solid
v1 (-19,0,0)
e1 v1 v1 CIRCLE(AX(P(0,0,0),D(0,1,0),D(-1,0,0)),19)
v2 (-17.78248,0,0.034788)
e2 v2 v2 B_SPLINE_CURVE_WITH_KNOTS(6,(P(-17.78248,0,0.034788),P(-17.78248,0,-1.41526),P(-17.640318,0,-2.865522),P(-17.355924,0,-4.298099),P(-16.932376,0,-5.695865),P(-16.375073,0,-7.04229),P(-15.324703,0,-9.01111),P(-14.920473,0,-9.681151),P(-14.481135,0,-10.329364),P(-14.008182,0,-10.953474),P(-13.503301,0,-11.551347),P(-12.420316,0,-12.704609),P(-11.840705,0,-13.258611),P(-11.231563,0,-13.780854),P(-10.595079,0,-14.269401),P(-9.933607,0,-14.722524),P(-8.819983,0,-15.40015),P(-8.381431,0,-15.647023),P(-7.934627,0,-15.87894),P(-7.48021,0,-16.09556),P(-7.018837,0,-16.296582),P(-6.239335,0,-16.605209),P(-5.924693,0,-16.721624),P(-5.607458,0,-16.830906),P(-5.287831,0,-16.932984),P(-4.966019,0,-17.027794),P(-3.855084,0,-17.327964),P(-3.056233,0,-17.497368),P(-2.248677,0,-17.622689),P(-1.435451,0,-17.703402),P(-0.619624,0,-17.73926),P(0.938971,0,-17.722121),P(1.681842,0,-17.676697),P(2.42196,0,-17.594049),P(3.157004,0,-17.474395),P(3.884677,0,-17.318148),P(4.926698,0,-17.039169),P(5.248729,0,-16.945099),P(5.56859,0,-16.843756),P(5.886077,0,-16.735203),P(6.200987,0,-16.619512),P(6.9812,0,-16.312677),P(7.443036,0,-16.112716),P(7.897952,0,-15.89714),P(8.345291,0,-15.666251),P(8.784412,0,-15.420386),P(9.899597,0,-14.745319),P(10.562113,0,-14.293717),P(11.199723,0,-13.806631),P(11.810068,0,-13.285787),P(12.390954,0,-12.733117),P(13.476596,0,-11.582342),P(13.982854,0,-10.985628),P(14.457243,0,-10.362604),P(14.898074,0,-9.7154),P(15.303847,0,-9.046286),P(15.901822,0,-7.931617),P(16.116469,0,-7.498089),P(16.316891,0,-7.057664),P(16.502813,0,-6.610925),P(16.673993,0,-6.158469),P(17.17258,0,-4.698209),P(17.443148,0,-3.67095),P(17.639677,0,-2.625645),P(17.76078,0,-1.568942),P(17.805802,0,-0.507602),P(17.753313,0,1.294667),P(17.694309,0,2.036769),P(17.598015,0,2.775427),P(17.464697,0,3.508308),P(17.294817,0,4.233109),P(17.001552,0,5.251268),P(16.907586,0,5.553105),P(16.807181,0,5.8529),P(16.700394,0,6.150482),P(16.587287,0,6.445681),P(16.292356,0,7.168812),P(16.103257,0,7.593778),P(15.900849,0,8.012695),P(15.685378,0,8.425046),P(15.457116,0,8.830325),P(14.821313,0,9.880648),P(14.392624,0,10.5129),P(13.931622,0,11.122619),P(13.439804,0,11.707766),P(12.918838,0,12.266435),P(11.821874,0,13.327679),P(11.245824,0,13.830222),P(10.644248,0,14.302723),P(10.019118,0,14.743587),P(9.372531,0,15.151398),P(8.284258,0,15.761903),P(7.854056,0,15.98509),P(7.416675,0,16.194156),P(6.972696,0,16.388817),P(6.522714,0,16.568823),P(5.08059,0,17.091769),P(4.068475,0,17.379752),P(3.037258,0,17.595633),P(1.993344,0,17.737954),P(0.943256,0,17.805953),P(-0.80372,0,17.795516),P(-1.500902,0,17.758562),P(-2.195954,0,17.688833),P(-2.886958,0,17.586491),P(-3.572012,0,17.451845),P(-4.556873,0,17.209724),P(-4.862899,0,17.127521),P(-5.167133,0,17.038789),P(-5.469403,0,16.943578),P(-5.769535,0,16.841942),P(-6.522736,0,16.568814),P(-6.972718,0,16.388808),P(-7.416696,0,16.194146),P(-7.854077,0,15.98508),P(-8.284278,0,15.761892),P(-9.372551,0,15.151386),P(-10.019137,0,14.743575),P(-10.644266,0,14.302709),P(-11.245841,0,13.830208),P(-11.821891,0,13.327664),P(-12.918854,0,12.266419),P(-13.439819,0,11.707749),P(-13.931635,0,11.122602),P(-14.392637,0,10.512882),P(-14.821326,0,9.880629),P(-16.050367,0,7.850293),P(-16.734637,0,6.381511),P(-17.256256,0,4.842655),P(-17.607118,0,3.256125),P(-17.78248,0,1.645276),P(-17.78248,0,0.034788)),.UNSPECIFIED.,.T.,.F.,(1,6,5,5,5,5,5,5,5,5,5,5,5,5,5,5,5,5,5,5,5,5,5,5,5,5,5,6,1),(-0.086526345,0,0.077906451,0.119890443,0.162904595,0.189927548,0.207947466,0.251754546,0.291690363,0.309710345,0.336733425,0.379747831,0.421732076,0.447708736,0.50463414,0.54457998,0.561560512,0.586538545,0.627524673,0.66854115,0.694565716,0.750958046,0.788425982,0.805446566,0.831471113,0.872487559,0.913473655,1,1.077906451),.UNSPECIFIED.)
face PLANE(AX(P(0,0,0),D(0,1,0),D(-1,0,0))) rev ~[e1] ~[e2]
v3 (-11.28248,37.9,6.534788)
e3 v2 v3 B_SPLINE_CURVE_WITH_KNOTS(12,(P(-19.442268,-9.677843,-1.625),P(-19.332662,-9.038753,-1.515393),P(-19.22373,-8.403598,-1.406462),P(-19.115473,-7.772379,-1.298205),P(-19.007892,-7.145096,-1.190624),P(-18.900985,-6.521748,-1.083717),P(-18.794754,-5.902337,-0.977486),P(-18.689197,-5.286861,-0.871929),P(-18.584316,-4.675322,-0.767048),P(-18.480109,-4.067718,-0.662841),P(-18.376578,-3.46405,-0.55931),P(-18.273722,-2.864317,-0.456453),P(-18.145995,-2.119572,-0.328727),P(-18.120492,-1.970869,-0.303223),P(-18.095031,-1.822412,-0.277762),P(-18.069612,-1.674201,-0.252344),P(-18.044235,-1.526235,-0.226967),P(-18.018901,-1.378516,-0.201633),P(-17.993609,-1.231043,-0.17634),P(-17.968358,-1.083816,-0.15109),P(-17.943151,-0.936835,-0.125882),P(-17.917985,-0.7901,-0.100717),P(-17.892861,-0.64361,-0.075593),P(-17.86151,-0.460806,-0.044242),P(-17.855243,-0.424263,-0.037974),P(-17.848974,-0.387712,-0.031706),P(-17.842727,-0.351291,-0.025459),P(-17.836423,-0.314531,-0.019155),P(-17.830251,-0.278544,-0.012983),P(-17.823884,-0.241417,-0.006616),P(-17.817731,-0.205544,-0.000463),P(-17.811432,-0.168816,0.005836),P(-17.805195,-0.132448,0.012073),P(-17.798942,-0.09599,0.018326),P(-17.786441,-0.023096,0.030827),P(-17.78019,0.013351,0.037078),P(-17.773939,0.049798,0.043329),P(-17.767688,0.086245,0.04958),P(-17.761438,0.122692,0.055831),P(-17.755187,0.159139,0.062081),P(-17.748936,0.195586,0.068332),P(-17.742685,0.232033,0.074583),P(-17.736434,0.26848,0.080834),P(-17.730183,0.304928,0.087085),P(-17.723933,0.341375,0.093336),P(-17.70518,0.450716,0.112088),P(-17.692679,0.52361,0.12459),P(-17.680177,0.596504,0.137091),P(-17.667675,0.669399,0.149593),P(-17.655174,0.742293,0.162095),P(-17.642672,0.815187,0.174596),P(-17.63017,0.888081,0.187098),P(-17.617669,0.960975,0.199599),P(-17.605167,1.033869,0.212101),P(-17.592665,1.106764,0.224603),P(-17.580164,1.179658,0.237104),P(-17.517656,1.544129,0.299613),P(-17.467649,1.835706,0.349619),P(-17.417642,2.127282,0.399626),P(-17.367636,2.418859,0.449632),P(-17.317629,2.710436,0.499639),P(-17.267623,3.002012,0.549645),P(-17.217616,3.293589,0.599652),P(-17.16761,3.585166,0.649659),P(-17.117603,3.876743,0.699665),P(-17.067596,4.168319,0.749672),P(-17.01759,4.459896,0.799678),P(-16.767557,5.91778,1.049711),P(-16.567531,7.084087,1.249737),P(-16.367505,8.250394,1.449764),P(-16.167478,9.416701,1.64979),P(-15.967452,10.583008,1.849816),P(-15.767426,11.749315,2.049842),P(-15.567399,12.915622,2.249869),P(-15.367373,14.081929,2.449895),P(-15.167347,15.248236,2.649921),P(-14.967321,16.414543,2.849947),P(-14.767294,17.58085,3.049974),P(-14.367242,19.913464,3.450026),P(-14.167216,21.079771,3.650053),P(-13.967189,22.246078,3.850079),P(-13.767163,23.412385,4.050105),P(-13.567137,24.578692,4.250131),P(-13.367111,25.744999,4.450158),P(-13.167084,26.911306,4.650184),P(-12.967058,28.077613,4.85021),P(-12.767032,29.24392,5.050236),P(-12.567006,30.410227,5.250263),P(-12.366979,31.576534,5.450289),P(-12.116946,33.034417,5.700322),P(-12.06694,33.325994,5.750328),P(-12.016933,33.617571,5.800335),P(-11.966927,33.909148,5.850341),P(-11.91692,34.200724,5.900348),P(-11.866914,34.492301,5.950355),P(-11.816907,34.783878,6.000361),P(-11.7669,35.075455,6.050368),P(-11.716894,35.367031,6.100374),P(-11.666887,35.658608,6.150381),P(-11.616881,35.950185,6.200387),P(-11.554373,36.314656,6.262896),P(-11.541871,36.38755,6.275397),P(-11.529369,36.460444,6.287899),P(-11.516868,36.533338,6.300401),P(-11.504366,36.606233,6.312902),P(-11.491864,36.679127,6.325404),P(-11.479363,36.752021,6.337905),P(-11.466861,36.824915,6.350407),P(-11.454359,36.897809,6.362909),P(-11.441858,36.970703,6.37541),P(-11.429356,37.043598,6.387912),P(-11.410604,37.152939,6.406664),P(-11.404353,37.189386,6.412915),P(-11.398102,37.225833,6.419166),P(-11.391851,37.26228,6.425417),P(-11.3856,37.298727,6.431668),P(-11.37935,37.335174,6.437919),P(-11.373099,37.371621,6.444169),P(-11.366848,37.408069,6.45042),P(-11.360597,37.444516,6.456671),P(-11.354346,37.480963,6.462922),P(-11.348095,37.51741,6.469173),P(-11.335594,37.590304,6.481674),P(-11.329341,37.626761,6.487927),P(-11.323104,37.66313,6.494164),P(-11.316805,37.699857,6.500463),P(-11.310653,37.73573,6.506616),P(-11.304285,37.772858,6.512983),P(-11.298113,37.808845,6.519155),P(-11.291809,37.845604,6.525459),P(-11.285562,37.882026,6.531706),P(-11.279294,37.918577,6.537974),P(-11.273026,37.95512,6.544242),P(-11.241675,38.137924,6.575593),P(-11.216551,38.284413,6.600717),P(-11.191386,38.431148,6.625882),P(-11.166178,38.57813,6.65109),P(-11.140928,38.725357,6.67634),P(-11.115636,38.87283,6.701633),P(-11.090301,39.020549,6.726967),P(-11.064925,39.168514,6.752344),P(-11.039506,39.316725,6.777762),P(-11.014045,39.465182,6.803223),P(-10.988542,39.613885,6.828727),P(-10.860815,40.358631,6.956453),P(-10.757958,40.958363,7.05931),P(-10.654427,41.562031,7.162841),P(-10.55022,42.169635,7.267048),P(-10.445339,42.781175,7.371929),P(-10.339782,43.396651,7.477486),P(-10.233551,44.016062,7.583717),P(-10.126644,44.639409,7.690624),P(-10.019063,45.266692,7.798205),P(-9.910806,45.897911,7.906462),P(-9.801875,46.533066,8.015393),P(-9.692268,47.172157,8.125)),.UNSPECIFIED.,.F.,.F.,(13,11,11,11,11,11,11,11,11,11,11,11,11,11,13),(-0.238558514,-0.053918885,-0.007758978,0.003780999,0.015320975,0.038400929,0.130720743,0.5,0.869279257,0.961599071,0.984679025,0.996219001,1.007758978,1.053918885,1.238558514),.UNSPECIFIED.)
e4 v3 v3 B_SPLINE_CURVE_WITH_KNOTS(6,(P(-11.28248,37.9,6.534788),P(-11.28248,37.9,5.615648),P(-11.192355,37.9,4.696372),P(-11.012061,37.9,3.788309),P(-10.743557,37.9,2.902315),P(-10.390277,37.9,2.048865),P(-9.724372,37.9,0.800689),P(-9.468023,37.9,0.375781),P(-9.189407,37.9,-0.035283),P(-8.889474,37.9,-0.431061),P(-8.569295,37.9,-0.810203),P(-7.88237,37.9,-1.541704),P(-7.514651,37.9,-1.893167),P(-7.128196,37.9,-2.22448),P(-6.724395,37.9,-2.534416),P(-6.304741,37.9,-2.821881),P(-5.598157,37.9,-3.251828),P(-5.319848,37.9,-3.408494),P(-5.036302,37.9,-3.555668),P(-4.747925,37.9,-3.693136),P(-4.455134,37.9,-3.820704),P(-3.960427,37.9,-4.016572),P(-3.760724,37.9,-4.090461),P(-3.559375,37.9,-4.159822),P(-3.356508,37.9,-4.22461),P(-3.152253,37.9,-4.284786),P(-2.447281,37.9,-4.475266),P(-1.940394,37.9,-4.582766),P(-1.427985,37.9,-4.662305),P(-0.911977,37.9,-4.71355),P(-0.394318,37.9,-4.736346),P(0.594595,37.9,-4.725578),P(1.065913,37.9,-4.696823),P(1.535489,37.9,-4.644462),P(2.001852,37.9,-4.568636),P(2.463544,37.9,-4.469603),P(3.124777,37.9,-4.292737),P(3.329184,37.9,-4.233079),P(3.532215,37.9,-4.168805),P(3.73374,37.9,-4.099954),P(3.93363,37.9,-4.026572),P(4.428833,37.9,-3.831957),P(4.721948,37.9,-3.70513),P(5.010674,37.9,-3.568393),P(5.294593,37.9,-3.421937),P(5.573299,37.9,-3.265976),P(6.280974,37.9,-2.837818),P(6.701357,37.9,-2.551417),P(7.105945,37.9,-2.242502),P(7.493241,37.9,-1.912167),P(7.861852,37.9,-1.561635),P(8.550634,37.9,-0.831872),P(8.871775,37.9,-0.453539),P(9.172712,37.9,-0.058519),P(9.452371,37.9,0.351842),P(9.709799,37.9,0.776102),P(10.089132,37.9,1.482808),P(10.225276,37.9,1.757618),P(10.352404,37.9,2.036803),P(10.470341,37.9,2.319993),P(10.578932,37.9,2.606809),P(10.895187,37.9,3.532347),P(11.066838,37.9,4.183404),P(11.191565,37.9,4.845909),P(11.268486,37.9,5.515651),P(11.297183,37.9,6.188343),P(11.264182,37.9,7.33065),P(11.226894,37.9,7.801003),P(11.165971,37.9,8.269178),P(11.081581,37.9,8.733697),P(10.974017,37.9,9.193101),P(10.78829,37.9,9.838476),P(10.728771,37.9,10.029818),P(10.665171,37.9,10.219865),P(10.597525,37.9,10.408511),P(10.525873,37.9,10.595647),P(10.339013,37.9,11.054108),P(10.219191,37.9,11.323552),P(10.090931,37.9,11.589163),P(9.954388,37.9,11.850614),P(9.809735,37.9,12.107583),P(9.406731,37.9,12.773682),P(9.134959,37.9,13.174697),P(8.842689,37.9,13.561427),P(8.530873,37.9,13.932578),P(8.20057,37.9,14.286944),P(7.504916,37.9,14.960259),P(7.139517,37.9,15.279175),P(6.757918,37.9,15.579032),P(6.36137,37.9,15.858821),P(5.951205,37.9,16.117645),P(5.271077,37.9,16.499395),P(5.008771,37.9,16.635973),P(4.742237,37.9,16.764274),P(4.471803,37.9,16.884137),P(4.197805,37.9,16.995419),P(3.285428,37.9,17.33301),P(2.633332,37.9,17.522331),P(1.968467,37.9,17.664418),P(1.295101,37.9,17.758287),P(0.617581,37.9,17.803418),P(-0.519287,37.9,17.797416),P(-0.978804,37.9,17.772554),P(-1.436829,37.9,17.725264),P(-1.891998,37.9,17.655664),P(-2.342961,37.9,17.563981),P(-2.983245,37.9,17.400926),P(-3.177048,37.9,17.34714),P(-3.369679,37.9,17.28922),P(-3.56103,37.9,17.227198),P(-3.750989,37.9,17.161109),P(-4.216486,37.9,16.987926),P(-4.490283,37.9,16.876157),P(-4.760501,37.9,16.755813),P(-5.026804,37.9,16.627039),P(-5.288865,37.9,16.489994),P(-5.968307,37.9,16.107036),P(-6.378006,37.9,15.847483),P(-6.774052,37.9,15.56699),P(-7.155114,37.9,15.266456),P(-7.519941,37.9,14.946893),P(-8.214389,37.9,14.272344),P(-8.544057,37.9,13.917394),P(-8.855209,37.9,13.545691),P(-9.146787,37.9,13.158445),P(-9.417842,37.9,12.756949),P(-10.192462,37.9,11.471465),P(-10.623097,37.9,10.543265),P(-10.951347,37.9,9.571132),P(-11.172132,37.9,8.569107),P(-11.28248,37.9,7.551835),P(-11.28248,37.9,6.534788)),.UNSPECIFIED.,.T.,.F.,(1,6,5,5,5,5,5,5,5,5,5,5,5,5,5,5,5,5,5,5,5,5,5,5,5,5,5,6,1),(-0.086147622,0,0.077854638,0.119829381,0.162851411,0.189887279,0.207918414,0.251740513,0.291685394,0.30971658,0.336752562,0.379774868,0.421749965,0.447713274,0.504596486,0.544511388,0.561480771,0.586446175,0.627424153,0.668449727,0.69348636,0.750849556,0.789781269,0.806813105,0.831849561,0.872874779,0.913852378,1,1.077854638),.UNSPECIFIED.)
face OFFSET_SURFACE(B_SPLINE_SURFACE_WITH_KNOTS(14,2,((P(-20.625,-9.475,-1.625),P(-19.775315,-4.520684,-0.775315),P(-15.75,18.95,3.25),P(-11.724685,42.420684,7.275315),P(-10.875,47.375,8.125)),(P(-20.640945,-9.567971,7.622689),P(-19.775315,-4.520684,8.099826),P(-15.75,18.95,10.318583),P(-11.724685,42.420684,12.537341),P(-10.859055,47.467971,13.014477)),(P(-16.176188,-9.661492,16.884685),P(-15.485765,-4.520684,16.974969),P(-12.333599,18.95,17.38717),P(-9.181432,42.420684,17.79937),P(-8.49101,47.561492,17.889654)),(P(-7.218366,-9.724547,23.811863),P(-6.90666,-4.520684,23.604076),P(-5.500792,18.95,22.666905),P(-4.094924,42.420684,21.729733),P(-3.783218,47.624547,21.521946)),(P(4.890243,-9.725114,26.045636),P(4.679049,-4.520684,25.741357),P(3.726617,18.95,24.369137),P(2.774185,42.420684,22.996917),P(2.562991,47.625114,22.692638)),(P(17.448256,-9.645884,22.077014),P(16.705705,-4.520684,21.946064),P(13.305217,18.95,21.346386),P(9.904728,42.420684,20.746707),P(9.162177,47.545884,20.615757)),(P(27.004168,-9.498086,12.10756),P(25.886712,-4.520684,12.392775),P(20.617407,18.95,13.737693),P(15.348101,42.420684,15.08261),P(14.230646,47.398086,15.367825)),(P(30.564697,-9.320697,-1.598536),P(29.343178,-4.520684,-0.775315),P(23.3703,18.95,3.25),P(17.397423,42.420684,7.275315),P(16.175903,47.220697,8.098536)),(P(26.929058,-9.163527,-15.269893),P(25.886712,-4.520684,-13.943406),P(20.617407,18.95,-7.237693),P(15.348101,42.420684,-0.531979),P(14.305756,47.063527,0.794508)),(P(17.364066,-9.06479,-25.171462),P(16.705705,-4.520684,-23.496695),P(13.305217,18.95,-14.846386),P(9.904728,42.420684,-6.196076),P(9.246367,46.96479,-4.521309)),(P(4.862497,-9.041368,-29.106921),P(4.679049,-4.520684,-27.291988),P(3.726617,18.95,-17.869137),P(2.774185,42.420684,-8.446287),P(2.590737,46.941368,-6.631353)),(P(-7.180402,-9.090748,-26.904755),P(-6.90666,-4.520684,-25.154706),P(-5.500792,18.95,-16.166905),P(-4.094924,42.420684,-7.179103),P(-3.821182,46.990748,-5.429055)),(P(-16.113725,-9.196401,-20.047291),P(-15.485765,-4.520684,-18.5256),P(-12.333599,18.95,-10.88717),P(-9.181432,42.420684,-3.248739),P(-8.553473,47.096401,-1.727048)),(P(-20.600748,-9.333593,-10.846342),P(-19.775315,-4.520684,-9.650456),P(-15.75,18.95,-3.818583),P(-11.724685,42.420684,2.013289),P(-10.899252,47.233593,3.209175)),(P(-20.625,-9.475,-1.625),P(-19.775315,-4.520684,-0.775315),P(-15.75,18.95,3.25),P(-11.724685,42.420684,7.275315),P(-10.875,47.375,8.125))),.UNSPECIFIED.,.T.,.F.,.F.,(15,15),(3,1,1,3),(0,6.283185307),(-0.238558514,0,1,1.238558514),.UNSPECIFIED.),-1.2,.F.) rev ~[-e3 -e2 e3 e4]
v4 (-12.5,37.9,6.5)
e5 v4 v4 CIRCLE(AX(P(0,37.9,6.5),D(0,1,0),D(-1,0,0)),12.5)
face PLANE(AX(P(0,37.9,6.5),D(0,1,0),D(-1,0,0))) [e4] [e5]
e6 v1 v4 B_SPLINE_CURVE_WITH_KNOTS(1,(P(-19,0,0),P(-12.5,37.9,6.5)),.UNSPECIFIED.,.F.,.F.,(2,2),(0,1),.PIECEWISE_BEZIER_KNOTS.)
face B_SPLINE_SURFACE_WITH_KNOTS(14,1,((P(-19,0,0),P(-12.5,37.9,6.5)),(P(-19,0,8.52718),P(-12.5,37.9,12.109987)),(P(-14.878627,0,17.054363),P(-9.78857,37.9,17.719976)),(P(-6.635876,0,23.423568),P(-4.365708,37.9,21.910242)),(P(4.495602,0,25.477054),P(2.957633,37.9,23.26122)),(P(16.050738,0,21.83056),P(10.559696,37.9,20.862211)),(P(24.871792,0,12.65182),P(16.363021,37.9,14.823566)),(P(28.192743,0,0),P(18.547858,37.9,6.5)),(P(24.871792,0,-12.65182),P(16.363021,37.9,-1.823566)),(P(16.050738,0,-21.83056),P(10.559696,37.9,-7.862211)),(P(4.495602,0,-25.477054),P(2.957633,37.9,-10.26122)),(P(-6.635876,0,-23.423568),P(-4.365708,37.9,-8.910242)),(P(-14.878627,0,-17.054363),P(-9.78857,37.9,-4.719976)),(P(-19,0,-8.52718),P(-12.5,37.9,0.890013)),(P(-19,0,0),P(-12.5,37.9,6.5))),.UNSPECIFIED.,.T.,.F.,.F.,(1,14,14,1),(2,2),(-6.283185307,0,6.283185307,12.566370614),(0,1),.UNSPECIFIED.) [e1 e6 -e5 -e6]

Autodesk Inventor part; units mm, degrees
ref_plane "YZ Plane" through (0, 0, 0) normal (1, 0, 0) x (0, 1, 0)
ref_plane "XY Plane" through (0, 0, 0) normal (0, 0, 1) x (1, 0, 0)
sketch "Szkic6" plane through (0, 0, 0) normal (0, 1, 0) x (-1, 0, 0)
  circle A0 centre (0, 0) radius 19
  dimension "d33" = 38
ref_plane "Płaszczyzna konstrukcyjna1" through (0, 37.9, 0) normal (0, 1, 0) x (-1, 0, 0)
sketch "Szkic7" plane through (0, 37.9, 0) normal (0, 1, 0) x (-1, 0, 0)
  circle A0 centre (0, 6.5) radius 12.5
  line L0 (0, -20.3) -> (0, 20.3) construction
  circle A1 centre (0, 0) radius 19 construction
  dimension "d35" = 25
loft "Wyciągnięcie złożone1" add profiles "Szkic6", "Szkic7"
shell "Skorupa1" thickness 1.2 removed faces 2 at (-0.5022, 37.9, 0.3694) at (-4.7406, 0, -4.1998)
equation "\"d33\" = OD1"
equation "\"d35\" = OD2"
equation "\"d52\" = THK"
equation "\"SzerokośćGięciaPodcięcia\" = Grubość"
equation "\"RozmiarPodcięciaNarożnika\" = 4 * Grubość"
equation "\"PromieńPrzejścia\" = PromieńGięcia"
equation "\"Rozmiar_promienia_Jacobiego\" = PromieńGięcia"
equation "\"Wielk_odstępu\" = Grubość"
equation "\"d2\" = PromieńGięcia"
equation "\"d23\" = PromieńGięcia"
equation "\"OD1\" = 38"
equation "\"OD2\" = 25"
equation "\"L\" = 37.9"
equation "\"THK\" = 1.2"
equation "\"d34\" = L"
equation "\"Grubość\" = 1.5"
equation "\"PromieńGięcia\" = 3"
properties part number "Redukcja asymetryczna Ø38x25x1,2 L=37,9" material "304"
